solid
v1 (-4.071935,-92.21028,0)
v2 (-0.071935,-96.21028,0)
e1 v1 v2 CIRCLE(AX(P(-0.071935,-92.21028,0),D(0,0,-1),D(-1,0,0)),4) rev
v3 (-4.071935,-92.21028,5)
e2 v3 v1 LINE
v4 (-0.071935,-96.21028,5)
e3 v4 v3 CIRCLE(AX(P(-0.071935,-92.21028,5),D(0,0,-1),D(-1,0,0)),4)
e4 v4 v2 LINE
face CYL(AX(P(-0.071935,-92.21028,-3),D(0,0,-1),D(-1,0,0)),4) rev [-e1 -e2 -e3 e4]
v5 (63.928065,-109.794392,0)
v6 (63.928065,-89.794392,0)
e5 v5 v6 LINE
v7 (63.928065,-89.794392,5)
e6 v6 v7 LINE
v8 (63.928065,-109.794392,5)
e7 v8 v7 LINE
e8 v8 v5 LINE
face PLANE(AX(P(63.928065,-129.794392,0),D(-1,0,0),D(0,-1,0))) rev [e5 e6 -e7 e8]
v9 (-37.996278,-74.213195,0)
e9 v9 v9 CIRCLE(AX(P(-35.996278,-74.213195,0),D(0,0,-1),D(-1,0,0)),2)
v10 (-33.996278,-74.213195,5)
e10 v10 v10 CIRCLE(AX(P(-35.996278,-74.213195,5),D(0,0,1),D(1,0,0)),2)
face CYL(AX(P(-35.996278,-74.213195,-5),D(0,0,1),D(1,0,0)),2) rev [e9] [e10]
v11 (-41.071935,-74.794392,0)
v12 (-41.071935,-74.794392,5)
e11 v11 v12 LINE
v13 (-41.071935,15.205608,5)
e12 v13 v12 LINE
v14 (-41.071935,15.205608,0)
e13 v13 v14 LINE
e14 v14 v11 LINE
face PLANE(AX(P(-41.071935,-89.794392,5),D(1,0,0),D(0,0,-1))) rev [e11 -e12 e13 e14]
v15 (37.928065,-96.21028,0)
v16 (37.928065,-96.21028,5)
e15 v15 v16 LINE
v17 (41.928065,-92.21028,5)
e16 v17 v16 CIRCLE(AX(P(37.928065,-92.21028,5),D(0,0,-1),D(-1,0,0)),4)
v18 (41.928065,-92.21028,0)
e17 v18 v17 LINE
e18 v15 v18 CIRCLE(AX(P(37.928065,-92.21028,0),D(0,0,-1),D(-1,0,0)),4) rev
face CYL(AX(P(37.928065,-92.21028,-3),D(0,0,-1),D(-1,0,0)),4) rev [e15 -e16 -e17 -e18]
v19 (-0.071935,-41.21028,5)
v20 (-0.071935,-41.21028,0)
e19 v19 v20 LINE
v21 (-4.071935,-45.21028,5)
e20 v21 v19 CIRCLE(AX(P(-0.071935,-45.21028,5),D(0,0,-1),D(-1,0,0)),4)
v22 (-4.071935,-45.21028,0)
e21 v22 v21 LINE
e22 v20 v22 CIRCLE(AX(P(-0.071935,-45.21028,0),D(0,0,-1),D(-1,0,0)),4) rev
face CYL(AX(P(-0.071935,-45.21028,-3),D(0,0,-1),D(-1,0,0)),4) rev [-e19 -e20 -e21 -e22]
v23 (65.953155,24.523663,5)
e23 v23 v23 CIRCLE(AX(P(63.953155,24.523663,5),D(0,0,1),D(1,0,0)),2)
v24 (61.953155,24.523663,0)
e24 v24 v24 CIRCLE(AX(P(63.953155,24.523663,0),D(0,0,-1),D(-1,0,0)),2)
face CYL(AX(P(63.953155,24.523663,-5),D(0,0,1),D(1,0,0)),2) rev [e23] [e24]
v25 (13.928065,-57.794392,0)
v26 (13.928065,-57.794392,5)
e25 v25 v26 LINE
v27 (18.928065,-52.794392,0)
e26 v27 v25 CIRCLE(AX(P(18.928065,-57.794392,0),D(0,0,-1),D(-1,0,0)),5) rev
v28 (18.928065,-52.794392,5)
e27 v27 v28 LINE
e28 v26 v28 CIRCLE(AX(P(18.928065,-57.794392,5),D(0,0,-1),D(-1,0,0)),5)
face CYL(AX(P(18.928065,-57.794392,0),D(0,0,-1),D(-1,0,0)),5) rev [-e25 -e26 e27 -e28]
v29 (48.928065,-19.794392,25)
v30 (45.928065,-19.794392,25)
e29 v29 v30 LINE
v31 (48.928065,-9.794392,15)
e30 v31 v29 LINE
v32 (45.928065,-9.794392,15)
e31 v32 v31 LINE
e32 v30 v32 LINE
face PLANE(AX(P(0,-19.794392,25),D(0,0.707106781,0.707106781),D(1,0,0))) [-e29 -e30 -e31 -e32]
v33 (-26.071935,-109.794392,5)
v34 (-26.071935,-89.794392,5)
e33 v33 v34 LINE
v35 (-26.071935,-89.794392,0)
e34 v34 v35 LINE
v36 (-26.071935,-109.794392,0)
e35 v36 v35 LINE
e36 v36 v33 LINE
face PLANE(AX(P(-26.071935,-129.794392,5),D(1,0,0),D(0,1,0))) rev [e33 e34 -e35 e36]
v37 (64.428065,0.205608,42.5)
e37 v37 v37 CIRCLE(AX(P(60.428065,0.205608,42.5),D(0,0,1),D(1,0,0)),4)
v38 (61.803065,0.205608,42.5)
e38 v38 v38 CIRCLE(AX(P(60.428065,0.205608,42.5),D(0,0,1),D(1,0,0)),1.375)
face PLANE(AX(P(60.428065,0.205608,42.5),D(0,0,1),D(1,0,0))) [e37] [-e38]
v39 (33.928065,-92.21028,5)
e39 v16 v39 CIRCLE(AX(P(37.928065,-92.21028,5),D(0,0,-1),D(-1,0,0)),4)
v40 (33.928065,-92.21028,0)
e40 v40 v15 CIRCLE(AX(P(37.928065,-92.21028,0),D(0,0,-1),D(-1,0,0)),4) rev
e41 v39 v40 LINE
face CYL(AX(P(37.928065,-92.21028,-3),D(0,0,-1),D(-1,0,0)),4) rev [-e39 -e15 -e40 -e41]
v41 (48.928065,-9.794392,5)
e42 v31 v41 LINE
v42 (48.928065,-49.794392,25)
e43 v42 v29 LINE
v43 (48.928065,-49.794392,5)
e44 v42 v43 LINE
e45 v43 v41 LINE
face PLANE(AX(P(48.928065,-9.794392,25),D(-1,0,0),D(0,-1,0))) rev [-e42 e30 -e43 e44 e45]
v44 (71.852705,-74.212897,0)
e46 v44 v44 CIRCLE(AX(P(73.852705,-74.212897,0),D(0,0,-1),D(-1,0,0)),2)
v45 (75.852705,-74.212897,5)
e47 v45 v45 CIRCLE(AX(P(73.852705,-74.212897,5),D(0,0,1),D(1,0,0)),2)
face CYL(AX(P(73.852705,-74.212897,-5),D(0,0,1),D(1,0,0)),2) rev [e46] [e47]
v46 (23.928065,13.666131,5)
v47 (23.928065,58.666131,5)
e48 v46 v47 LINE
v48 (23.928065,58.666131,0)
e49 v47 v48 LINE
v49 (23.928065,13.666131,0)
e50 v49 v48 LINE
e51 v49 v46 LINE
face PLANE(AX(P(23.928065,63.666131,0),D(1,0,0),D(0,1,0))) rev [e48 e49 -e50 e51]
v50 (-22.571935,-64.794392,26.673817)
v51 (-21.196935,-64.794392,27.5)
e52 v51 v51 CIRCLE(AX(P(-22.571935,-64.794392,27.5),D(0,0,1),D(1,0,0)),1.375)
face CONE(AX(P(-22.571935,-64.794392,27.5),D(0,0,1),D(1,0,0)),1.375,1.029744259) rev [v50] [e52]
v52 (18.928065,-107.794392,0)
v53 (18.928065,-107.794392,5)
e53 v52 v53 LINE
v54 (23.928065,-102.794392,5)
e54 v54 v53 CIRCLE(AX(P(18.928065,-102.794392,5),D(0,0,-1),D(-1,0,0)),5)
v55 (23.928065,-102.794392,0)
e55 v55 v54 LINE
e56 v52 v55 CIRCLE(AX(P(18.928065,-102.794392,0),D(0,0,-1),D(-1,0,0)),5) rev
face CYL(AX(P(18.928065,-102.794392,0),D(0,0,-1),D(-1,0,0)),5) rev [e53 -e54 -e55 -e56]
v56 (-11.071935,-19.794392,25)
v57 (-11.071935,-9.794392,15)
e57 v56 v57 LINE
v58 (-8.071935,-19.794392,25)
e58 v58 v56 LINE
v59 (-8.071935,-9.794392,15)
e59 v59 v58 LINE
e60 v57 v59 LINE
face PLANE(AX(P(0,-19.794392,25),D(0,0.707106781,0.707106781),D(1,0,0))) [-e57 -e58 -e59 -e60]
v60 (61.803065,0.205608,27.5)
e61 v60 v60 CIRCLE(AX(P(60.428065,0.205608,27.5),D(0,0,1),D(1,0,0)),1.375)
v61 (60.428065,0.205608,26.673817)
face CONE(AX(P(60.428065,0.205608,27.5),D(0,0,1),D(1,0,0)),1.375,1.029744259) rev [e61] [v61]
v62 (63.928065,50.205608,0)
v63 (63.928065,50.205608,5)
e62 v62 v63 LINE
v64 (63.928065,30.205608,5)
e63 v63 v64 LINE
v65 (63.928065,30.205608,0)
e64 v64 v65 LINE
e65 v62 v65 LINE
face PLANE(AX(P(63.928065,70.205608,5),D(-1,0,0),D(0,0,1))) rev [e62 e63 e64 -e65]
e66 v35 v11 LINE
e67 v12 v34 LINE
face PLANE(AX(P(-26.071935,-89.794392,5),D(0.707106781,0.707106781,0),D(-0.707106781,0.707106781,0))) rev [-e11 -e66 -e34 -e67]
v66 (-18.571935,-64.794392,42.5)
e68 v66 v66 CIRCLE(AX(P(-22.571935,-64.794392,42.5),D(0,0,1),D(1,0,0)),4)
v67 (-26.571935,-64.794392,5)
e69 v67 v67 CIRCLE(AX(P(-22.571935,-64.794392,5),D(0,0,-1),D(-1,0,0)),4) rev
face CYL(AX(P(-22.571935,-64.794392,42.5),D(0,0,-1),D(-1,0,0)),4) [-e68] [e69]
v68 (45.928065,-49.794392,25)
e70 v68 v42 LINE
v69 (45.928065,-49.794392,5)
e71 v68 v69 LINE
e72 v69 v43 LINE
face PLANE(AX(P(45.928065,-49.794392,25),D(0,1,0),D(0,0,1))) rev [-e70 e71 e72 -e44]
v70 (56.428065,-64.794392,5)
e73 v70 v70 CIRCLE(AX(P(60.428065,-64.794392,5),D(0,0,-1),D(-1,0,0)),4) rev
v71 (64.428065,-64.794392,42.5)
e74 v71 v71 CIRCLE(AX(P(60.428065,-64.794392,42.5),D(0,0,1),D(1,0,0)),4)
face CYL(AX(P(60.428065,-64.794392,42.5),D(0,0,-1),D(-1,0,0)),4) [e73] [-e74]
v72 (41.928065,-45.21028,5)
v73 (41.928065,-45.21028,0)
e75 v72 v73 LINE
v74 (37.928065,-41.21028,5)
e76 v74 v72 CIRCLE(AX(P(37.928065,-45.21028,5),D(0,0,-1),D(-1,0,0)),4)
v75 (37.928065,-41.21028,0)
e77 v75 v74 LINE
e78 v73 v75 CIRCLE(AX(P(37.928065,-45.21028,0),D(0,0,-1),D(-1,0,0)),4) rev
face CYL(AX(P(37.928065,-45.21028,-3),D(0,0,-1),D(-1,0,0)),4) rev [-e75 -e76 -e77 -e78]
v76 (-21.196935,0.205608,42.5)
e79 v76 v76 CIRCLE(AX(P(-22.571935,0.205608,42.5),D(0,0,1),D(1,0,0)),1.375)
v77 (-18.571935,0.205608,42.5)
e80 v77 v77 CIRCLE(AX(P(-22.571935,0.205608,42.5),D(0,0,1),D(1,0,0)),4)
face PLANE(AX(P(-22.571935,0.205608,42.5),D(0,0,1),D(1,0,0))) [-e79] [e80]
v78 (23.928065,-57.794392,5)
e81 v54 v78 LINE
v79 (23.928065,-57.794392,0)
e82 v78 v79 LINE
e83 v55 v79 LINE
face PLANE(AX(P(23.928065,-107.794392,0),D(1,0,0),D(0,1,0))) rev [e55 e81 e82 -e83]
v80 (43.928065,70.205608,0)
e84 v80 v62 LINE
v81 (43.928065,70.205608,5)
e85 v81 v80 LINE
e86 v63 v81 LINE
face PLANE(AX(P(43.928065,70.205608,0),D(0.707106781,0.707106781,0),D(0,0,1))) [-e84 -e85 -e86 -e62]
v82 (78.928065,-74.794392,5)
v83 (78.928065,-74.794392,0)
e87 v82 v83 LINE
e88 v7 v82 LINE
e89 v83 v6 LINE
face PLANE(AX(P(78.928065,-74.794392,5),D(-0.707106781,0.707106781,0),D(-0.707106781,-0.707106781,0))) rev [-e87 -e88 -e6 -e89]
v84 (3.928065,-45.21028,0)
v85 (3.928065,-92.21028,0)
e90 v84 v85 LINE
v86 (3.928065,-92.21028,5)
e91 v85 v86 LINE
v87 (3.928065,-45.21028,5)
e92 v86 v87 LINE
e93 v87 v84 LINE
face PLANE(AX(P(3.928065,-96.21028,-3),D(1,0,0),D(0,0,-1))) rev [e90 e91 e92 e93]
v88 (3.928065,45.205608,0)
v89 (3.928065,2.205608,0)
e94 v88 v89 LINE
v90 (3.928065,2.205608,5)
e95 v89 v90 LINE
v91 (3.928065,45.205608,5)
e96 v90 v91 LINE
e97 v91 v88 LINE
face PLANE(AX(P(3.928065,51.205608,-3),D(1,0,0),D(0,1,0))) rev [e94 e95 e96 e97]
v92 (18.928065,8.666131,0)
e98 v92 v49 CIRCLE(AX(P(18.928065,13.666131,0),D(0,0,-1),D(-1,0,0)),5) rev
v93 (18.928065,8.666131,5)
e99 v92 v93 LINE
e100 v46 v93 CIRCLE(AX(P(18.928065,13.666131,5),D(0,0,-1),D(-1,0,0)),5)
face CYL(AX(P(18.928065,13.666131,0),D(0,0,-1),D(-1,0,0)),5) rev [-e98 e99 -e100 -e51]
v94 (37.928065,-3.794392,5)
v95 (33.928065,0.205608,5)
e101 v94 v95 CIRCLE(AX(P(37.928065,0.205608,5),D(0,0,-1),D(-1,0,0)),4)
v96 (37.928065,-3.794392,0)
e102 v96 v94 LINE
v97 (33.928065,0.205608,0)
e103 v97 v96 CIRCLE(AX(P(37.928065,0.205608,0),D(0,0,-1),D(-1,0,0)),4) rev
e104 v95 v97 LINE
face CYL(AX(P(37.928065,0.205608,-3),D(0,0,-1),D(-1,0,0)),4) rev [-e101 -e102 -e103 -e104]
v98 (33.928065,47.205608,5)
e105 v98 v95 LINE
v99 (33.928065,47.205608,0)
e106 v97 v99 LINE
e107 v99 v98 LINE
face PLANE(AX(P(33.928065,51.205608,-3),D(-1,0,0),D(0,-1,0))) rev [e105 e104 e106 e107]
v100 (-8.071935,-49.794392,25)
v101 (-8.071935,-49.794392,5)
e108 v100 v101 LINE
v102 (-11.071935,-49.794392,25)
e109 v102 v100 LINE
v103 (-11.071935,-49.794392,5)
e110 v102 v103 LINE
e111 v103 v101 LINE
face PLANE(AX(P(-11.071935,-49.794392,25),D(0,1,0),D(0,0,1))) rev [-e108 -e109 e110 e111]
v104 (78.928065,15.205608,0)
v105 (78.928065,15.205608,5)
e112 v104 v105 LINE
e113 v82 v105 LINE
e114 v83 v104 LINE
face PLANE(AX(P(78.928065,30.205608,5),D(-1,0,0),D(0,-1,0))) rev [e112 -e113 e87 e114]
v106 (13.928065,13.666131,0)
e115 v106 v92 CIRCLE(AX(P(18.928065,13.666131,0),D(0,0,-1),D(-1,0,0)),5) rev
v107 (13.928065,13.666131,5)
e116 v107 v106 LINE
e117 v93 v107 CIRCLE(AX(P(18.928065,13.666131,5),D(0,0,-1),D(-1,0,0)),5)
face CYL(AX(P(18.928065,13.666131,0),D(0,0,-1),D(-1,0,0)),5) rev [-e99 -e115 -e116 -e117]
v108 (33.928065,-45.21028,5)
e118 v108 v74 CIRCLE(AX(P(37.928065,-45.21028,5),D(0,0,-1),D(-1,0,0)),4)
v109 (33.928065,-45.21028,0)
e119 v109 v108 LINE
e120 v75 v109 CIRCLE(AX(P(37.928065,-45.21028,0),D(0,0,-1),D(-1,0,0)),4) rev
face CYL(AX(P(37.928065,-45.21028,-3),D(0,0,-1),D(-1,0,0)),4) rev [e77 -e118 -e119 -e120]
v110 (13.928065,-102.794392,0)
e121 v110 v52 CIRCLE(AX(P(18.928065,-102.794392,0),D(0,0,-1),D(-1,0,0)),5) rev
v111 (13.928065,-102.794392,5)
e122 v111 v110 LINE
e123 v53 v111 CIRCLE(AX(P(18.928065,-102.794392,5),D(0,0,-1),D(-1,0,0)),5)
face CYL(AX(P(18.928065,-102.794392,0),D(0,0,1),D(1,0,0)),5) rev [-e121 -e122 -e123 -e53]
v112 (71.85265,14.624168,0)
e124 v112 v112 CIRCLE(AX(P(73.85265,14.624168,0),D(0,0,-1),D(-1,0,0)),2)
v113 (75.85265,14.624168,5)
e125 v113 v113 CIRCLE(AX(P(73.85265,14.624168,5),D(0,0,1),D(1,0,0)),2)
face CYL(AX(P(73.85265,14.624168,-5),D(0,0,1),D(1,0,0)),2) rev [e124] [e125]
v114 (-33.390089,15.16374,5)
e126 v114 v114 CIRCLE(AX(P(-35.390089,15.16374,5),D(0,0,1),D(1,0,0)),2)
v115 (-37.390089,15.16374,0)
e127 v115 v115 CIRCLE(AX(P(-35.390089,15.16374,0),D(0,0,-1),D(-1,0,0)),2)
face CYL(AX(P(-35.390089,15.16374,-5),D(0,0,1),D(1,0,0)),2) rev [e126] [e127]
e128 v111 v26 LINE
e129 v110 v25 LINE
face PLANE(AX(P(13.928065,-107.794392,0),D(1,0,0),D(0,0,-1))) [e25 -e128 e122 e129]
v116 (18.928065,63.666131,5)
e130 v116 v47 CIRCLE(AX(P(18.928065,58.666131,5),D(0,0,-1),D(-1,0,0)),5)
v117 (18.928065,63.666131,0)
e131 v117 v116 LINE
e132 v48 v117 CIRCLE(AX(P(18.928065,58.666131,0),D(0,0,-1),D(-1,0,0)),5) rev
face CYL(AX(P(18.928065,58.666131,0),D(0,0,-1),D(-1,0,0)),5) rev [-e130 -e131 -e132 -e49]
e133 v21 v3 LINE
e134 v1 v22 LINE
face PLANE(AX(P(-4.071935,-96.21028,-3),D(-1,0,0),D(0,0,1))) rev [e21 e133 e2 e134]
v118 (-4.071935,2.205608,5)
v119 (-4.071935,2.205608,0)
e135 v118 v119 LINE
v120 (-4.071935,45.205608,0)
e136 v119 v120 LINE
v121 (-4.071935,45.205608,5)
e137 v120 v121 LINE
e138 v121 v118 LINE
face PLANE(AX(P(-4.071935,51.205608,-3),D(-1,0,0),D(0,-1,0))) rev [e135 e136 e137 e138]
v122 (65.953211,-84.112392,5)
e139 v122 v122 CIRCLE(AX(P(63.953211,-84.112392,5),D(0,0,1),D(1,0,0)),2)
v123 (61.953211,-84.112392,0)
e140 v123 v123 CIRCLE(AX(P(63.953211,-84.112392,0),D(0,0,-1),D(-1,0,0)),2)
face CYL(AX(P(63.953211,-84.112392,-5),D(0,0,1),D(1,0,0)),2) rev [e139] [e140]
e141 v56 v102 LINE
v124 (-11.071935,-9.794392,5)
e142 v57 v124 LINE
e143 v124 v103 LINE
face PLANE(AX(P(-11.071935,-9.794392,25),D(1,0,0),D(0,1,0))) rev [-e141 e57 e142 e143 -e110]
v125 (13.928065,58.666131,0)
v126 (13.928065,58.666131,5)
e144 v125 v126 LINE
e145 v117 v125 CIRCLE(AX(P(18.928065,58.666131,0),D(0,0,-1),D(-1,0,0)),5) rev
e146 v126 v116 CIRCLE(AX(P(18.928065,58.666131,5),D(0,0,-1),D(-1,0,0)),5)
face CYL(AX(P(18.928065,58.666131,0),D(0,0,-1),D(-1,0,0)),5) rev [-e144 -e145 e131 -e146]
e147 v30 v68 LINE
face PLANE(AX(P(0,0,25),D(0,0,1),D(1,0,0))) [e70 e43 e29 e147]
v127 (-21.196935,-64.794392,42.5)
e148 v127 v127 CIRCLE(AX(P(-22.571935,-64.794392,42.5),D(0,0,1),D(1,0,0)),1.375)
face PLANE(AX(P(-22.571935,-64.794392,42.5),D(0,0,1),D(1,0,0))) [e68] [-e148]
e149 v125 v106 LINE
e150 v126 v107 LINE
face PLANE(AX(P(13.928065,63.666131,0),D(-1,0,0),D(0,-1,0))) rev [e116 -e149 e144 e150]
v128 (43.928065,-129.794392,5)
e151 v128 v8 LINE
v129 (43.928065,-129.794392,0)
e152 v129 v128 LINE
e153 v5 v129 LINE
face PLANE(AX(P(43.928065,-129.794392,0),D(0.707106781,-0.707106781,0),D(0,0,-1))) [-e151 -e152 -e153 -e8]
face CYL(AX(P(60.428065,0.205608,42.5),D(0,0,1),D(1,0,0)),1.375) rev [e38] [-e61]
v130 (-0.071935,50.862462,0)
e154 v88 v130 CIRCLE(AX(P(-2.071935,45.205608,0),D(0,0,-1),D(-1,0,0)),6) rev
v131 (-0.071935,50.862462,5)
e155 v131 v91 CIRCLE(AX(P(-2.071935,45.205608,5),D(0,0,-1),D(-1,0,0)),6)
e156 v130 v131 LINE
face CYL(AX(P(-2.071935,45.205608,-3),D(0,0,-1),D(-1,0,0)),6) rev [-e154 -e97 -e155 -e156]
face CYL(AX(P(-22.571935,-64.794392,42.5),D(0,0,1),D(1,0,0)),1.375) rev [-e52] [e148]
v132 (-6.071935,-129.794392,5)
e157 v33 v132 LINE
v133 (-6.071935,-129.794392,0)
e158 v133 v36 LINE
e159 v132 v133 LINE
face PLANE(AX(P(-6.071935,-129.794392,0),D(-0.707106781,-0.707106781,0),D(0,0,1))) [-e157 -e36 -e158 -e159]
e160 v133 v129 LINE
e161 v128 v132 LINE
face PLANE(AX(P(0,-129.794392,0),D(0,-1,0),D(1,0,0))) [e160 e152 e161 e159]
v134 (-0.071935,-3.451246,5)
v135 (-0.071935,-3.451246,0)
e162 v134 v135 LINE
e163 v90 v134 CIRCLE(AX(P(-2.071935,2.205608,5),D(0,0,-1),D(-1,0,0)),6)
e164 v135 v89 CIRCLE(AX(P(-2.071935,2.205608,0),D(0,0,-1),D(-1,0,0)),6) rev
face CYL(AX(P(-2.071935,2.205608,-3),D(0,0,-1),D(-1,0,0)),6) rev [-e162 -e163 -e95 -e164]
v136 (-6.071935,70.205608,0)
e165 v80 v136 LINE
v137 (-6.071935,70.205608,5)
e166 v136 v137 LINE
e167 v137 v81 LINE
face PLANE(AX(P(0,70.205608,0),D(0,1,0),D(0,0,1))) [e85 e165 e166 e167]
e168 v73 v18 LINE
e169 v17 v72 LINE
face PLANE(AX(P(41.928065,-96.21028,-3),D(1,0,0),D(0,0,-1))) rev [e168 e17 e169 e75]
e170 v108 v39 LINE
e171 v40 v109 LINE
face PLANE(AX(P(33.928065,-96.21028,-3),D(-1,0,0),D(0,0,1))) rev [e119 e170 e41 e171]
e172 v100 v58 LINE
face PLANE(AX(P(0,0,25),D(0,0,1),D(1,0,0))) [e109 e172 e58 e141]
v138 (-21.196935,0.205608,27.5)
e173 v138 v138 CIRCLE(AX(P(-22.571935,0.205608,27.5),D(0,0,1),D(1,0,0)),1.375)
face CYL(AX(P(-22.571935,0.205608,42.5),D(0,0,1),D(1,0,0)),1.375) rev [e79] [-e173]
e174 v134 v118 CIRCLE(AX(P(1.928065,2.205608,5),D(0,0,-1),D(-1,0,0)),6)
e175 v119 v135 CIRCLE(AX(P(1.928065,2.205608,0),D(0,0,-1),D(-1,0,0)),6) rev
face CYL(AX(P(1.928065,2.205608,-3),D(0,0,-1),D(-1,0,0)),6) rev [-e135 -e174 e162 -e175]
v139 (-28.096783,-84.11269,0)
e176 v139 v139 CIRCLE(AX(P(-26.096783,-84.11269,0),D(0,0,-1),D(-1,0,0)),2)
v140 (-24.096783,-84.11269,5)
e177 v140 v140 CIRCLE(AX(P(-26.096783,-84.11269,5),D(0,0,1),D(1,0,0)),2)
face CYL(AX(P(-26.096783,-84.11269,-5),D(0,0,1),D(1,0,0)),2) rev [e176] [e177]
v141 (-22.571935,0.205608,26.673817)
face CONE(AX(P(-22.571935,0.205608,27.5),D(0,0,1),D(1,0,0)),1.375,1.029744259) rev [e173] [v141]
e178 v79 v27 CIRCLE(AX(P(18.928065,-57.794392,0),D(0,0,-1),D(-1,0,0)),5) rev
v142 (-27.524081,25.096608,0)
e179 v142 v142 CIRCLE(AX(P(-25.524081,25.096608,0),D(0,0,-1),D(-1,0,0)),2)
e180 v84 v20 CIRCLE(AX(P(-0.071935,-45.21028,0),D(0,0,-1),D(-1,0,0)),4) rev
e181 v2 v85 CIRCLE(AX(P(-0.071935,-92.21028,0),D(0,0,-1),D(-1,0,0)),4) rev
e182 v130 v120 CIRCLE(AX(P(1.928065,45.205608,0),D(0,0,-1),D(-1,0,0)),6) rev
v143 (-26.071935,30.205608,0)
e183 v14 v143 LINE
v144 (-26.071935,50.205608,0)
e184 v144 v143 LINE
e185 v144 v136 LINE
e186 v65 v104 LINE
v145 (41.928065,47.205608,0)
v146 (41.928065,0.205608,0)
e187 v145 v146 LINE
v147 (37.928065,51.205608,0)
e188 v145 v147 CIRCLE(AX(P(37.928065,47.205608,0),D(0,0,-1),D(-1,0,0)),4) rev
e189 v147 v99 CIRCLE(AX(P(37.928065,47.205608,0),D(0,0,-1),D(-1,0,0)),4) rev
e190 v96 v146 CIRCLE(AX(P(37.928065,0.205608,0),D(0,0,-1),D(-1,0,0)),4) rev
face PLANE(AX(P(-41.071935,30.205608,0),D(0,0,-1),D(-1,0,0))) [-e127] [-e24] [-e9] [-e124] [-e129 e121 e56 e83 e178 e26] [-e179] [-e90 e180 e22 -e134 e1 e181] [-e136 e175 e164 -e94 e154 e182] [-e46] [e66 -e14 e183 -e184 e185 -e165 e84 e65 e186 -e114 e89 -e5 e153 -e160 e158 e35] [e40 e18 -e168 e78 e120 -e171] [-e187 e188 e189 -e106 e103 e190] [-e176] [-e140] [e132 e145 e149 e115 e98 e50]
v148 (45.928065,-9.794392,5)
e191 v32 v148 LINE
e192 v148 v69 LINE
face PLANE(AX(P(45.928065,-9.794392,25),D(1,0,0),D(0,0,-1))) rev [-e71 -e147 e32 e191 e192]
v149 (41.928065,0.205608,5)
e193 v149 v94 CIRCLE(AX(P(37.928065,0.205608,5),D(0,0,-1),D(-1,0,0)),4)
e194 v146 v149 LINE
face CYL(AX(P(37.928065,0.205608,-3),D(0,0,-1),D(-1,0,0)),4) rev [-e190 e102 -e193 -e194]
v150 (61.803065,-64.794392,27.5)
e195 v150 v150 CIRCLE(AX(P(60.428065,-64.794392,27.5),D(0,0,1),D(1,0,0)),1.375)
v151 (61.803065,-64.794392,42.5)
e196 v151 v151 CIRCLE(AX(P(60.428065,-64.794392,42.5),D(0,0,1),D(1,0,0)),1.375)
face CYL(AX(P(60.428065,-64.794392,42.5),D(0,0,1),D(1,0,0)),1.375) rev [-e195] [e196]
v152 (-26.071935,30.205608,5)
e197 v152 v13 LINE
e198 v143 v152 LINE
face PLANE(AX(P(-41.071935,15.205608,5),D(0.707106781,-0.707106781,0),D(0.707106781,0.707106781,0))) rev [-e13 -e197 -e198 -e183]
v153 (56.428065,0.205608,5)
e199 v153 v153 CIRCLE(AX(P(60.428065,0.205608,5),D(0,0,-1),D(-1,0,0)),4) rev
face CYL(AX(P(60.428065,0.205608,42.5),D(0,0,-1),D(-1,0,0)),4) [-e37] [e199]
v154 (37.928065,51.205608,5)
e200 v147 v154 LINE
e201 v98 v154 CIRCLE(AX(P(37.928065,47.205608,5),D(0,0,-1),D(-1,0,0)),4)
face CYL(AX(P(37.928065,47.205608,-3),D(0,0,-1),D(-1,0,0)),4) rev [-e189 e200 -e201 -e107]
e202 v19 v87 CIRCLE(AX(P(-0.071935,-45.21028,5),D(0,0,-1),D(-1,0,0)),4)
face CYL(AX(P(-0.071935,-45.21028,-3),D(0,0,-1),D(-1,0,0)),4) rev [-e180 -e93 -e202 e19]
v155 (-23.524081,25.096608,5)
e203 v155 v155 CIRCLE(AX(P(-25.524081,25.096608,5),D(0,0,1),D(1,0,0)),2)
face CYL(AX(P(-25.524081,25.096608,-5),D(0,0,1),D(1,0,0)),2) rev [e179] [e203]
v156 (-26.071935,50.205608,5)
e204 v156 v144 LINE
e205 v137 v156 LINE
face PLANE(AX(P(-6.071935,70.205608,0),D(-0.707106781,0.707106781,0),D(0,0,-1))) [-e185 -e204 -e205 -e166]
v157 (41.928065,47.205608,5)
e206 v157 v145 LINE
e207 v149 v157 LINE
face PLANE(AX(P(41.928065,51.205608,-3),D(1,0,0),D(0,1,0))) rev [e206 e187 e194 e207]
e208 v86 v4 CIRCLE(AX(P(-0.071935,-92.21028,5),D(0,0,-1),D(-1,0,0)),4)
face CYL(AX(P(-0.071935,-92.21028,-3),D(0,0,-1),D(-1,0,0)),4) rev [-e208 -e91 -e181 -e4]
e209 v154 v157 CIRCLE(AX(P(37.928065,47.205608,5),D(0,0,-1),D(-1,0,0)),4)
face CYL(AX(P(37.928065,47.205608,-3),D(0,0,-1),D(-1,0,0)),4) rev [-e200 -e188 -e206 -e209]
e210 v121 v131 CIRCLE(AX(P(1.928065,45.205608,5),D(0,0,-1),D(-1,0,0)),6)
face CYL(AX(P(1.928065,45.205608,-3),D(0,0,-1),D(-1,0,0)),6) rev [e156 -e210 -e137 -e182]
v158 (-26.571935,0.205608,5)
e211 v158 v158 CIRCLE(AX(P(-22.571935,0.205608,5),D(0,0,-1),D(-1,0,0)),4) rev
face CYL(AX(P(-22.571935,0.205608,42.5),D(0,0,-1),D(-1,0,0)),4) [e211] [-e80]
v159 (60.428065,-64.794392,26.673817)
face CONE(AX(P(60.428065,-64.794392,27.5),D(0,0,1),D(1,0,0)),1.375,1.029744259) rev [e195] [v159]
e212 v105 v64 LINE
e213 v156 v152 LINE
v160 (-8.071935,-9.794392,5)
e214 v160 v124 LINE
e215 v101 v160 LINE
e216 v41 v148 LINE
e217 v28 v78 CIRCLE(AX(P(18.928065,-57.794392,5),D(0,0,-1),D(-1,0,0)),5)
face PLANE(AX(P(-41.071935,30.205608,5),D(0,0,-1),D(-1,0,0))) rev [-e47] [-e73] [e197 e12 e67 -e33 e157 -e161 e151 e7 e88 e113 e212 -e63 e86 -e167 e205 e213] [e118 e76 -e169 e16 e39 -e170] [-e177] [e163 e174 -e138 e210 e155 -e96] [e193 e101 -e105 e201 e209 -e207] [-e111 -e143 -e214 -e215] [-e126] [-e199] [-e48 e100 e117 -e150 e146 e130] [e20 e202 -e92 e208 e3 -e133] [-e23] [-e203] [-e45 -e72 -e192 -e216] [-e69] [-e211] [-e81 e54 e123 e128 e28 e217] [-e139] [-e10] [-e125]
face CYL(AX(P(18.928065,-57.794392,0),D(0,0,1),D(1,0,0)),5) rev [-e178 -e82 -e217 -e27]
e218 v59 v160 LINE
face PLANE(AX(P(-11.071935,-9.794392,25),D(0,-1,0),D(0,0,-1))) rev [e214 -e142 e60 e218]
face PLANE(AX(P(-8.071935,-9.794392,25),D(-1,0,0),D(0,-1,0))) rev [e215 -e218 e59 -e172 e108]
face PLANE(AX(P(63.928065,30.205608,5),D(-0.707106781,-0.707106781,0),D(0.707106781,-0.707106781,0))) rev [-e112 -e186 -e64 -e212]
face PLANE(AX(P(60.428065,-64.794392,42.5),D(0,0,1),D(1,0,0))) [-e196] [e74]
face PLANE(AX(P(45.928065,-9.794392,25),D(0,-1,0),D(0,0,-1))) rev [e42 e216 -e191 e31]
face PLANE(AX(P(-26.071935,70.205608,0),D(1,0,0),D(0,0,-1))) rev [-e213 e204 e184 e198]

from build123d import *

# Parameters (mm, degrees)
ESQUISSE1_W             = 120
ESQUISSE1_H             = 120
BOSS_EXTRU_2_DEPTH      = 5
ESQUISSE9_R             = 4
BOSS_EXTRU_4_DEPTH      = 37.5
CHANFREIN5_SIZE         = 15
CHANFREIN6_SIZE         = 15
CHANFREIN7_SIZE         = 15
CHANFREIN8_SIZE         = 15
D_GAGEMENT_61_D         = 2.75
D_GAGEMENT_61_DEPTH     = 15
D_GAGEMENT_61_TIP       = 0.826183351
ESQUISSE21_W            = 90
ESQUISSE21_H            = 5
BOSS_EXTRU_7_DEPTH      = 40
ESQUISSE22_W            = 90
ESQUISSE22_H            = 5
BOSS_EXTRU_8_DEPTH      = 40
CHANFREIN23_SIZE        = 20
ESQUISSE23_R            = 2
ENL_V_MAT_EXTRU_1_DEPTH = 10
SKETCH1_W               = 10
SKETCH1_H               = 55
CUT_EXTRUDE2_DEPTH      = 5
FILLET2_R               = 5
FILLET3_R               = 5
SKETCH3_W               = 10
SKETCH3_H               = 55
CUT_EXTRUDE4_DEPTH      = 5
FILLET11_R              = 5
SKETCH2_W               = 8
SKETCH2_H               = 55
CUT_EXTRUDE5_DEPTH      = 8
SKETCH4_W               = 8
SKETCH4_H               = 55
CUT_EXTRUDE6_DEPTH      = 8
FILLET12_R              = 4
FILLET13_R              = 6
FILLET14_R              = 4
FILLET15_R              = 4
SKETCH5_W               = 3
SKETCH5_H               = 40
BOSS_EXTRUDE1_DEPTH     = 20
CHAMFER1_SIZE           = 10
CHAMFER2_SIZE           = 10


# Some blends are built 0.0001 mm under size
with BuildPart() as part:
    # Esquisse1 → Boss.-Extru.2 (new body)
    with BuildSketch(Plane.XY):
        with Locations((18.92806479, -29.794391972)):
            Rectangle(ESQUISSE1_W, ESQUISSE1_H)
    extrude(amount=BOSS_EXTRU_2_DEPTH)

    # Esquisse9 → Boss.-Extru.4 (add)
    with BuildSketch(Plane.XY.offset(5)):
        with Locations(Location((-22.57193521, -64.794391972, 0), (0, 0, 180))):
            Circle(ESQUISSE9_R)
        with Locations(Location((-22.57193521, 0.205608028, 0), (0, 0, 180))):
            Circle(ESQUISSE9_R)
        with Locations(Location((60.42806479, 0.205608028, 0), (0, 0, 180))):
            Circle(ESQUISSE9_R)
        with Locations(Location((60.42806479, -64.794391972, 0), (0, 0, 180))):
            Circle(ESQUISSE9_R)
    extrude(amount=BOSS_EXTRU_4_DEPTH)

    # Chanfrein5
    chanfrein5_edges = [part.edges().sort_by_distance(p)[0] for p in [
        (78.92806479, -89.794391972, 2.5),
    ]]
    chamfer(chanfrein5_edges, length=CHANFREIN5_SIZE)

    # Chanfrein6
    chanfrein6_edges = [part.edges().sort_by_distance(p)[0] for p in [
        (78.92806479, 30.205608028, 2.5),
    ]]
    chamfer(chanfrein6_edges, length=CHANFREIN6_SIZE)

    # Chanfrein7
    chanfrein7_edges = [part.edges().sort_by_distance(p)[0] for p in [
        (-41.07193521, 30.205608028, 2.5),
    ]]
    chamfer(chanfrein7_edges, length=CHANFREIN7_SIZE)

    # Chanfrein8
    chanfrein8_edges = [part.edges().sort_by_distance(p)[0] for p in [
        (-41.07193521, -89.794391972, 2.5),
    ]]
    chamfer(chanfrein8_edges, length=CHANFREIN8_SIZE)

    # Dégagement #61
    with Locations(Plane(origin=(-22.57193521, -64.794391972, 42.5), x_dir=(1, 0, 0), z_dir=(0, 0, 1))):
        with Locations((0, 0), (83, 0), (83, 65), (0, 65)):
            Hole(D_GAGEMENT_61_D / 2, depth=D_GAGEMENT_61_DEPTH)
            with Locations((0, 0, -(D_GAGEMENT_61_DEPTH + D_GAGEMENT_61_TIP / 2))):  # 118° drill point
                Cone(0, D_GAGEMENT_61_D / 2, D_GAGEMENT_61_TIP, mode=Mode.SUBTRACT)

    # Esquisse21 → Boss.-Extru.7 (add)
    with BuildSketch(Plane(origin=(0, -89.794391972, 0), x_dir=(-1, 0, 0), z_dir=(0, -1, 0))):
        with Locations((-18.92806479, -2.5)):
            Rectangle(ESQUISSE21_W, ESQUISSE21_H)
    extrude(amount=BOSS_EXTRU_7_DEPTH)

    # Esquisse22 → Boss.-Extru.8 (add)
    with BuildSketch(Plane(origin=(0, 30.205608028, 0), x_dir=(1, 0, 0), z_dir=(0, 1, 0))):
        with Locations((18.92806479, -2.5)):
            Rectangle(ESQUISSE22_W, ESQUISSE22_H)
    extrude(amount=BOSS_EXTRU_8_DEPTH)

    # Chanfrein23
    chanfrein23_edges = [part.edges().sort_by_distance(p)[0] for p in [
        (-26.07193521, -129.794391972, 2.5),
        (63.92806479, -129.794391972, 2.5),
        (63.92806479, 70.205608028, 2.5),
        (-26.07193521, 70.205608028, 2.5),
    ]]
    chamfer(chanfrein23_edges, length=CHANFREIN23_SIZE)

    # Esquisse23 → Enlèv. mat.-Extru.1 (cut)
    with BuildSketch(Plane.XY.offset(5)):
        with Locations((-35.996277988, -74.213194945)):
            Circle(ESQUISSE23_R)
        with Locations((-26.096783051, -84.112689881)):
            Circle(ESQUISSE23_R)
        with Locations((-25.52408096, 25.096608028)):
            Circle(ESQUISSE23_R)
        with Locations((-35.390089468, 15.163739554)):
            Circle(ESQUISSE23_R)
        with Locations((63.953155144, 24.523663425)):
            Circle(ESQUISSE23_R)
        with Locations((73.85265008, 14.624168488)):
            Circle(ESQUISSE23_R)
        with Locations((63.953210541, -84.112391972)):
            Circle(ESQUISSE23_R)
        with Locations((73.852705477, -74.212897035)):
            Circle(ESQUISSE23_R)
    extrude(amount=-ENL_V_MAT_EXTRU_1_DEPTH, mode=Mode.SUBTRACT)

    # Sketch1 → Cut-Extrude2 (cut)
    with BuildSketch(Plane.XY.offset(5)):
        with Locations((18.92806479, -80.294391972)):
            Rectangle(SKETCH1_W, SKETCH1_H)
    extrude(amount=-CUT_EXTRUDE2_DEPTH, mode=Mode.SUBTRACT)

    # Fillet2
    fillet2_edges = [part.edges().sort_by_distance(p)[0] for p in [
        (13.92806479, -107.794391972, 2.5),
    ]]
    fillet(fillet2_edges, radius=FILLET2_R)

    # Fillet3
    fillet3_edges = [part.edges().sort_by_distance(p)[0] for p in [
        (13.92806479, -52.794391972, 2.5),
        (23.92806479, -52.794391972, 2.5),
        (23.92806479, -107.794391972, 2.5),
    ]]
    fillet(fillet3_edges, radius=FILLET3_R - 0.0001)  # a hair under: the kernel refuses the full size

    # Sketch3 → Cut-Extrude4 (cut)
    with BuildSketch(Plane.XY.offset(5)):
        with Locations((18.92806479, 36.166130895)):
            Rectangle(SKETCH3_W, SKETCH3_H)
    extrude(amount=-CUT_EXTRUDE4_DEPTH, mode=Mode.SUBTRACT)

    # Fillet11
    fillet11_edges = [part.edges().sort_by_distance(p)[0] for p in [
        (13.92806479, 63.666130895, 2.5),
        (23.92806479, 63.666130895, 2.5),
        (23.92806479, 8.666130895, 2.5),
        (13.92806479, 8.666130895, 2.5),
    ]]
    fillet(fillet11_edges, radius=FILLET11_R - 0.0001)  # a hair under: the kernel refuses the full size

    # Sketch2 → Cut-Extrude5 (cut)
    with BuildSketch(Plane.XY.offset(5)):
        with Locations((37.92806479, -68.710279878)):
            Rectangle(SKETCH2_W, SKETCH2_H)
        with Locations((-0.07193521, -68.710279878)):
            Rectangle(SKETCH2_W, SKETCH2_H)
    extrude(amount=-CUT_EXTRUDE5_DEPTH, mode=Mode.SUBTRACT)

    # Sketch4 → Cut-Extrude6 (cut)
    with BuildSketch(Plane.XY.offset(5)):
        with Locations((-0.07193521, 23.705608028)):
            Rectangle(SKETCH4_W, SKETCH4_H)
        with Locations((37.92806479, 23.705608028)):
            Rectangle(SKETCH4_W, SKETCH4_H)
    extrude(amount=-CUT_EXTRUDE6_DEPTH, mode=Mode.SUBTRACT)

    # Fillet12
    fillet12_edges = [part.edges().sort_by_distance(p)[0] for p in [
        (33.92806479, 51.205608028, 2.5),
        (41.92806479, 51.205608028, 2.5),
        (41.92806479, -3.794391972, 2.5),
        (33.92806479, -3.794391972, 2.5),
    ]]
    fillet(fillet12_edges, radius=FILLET12_R - 0.0001)  # a hair under: the kernel refuses the full size

    # Fillet13
    # the kernel refuses this fillet: 6 mm, written as the material it adds along each edge
    with BuildSketch(Plane(origin=(-4.07193521, -3.794391972, 5), x_dir=(1, 0, 0), z_dir=(0, 0, -1)), Plane(origin=(3.92806479, -3.794391972, 5), x_dir=(0, 1, 0), z_dir=(0, 0, -1)), Plane(origin=(-4.07193521, 51.205608028, 5), x_dir=(0, -1, 0), z_dir=(0, 0, -1))) as fillet13_piece_1:
        with BuildLine():
            CenterArc((FILLET13_R, -FILLET13_R), FILLET13_R, 90, 90)
            Line((0, -FILLET13_R), (0, 0))
            Line((0, 0), (FILLET13_R, 0))
        make_face()
    extrude(amount=5)
    with BuildSketch(Plane(origin=(3.92806479, 51.205608028, 5), x_dir=(0, -1, 0), z_dir=(0, 0, -1))) as fillet13_piece_2:
        with BuildLine():
            CenterArc((FILLET13_R, FILLET13_R), FILLET13_R, 180, 90)
            Line((0, FILLET13_R), (0, 0))
            Line((0, 0), (FILLET13_R, 0))
        make_face()
    extrude(amount=5)

    # Fillet14
    fillet14_edges = [part.edges().sort_by_distance(p)[0] for p in [
        (3.92806479, -41.210279878, 2.5),
        (-4.07193521, -41.210279878, 2.5),
        (-4.07193521, -96.210279878, 2.5),
        (3.92806479, -96.210279878, 2.5),
    ]]
    fillet(fillet14_edges, radius=FILLET14_R - 0.0001)  # a hair under: the kernel refuses the full size

    # Fillet15
    fillet15_edges = [part.edges().sort_by_distance(p)[0] for p in [
        (41.92806479, -96.210279878, 2.5),
        (33.92806479, -96.210279878, 2.5),
        (33.92806479, -41.210279878, 2.5),
        (41.92806479, -41.210279878, 2.5),
    ]]
    fillet(fillet15_edges, radius=FILLET15_R - 0.0001)  # a hair under: the kernel refuses the full size

    # Sketch5 → Boss-Extrude1 (add)
    with BuildSketch(Plane.XY.offset(5)):
        with Locations((-9.57193521, -29.794391972)):
            Rectangle(SKETCH5_W, SKETCH5_H)
        with Locations((47.42806479, -29.794391972)):
            Rectangle(SKETCH5_W, SKETCH5_H)
    extrude(amount=BOSS_EXTRUDE1_DEPTH)

    # Chamfer1
    chamfer1_edges = [part.edges().sort_by_distance(p)[0] for p in [
        (47.42806479, -9.794391972, 25),
    ]]
    chamfer(chamfer1_edges, length=CHAMFER1_SIZE)

    # Chamfer2
    chamfer2_edges = [part.edges().sort_by_distance(p)[0] for p in [
        (-9.57193521, -9.794391972, 25),
    ]]
    chamfer(chamfer2_edges, length=CHAMFER2_SIZE)


solid = part.part
